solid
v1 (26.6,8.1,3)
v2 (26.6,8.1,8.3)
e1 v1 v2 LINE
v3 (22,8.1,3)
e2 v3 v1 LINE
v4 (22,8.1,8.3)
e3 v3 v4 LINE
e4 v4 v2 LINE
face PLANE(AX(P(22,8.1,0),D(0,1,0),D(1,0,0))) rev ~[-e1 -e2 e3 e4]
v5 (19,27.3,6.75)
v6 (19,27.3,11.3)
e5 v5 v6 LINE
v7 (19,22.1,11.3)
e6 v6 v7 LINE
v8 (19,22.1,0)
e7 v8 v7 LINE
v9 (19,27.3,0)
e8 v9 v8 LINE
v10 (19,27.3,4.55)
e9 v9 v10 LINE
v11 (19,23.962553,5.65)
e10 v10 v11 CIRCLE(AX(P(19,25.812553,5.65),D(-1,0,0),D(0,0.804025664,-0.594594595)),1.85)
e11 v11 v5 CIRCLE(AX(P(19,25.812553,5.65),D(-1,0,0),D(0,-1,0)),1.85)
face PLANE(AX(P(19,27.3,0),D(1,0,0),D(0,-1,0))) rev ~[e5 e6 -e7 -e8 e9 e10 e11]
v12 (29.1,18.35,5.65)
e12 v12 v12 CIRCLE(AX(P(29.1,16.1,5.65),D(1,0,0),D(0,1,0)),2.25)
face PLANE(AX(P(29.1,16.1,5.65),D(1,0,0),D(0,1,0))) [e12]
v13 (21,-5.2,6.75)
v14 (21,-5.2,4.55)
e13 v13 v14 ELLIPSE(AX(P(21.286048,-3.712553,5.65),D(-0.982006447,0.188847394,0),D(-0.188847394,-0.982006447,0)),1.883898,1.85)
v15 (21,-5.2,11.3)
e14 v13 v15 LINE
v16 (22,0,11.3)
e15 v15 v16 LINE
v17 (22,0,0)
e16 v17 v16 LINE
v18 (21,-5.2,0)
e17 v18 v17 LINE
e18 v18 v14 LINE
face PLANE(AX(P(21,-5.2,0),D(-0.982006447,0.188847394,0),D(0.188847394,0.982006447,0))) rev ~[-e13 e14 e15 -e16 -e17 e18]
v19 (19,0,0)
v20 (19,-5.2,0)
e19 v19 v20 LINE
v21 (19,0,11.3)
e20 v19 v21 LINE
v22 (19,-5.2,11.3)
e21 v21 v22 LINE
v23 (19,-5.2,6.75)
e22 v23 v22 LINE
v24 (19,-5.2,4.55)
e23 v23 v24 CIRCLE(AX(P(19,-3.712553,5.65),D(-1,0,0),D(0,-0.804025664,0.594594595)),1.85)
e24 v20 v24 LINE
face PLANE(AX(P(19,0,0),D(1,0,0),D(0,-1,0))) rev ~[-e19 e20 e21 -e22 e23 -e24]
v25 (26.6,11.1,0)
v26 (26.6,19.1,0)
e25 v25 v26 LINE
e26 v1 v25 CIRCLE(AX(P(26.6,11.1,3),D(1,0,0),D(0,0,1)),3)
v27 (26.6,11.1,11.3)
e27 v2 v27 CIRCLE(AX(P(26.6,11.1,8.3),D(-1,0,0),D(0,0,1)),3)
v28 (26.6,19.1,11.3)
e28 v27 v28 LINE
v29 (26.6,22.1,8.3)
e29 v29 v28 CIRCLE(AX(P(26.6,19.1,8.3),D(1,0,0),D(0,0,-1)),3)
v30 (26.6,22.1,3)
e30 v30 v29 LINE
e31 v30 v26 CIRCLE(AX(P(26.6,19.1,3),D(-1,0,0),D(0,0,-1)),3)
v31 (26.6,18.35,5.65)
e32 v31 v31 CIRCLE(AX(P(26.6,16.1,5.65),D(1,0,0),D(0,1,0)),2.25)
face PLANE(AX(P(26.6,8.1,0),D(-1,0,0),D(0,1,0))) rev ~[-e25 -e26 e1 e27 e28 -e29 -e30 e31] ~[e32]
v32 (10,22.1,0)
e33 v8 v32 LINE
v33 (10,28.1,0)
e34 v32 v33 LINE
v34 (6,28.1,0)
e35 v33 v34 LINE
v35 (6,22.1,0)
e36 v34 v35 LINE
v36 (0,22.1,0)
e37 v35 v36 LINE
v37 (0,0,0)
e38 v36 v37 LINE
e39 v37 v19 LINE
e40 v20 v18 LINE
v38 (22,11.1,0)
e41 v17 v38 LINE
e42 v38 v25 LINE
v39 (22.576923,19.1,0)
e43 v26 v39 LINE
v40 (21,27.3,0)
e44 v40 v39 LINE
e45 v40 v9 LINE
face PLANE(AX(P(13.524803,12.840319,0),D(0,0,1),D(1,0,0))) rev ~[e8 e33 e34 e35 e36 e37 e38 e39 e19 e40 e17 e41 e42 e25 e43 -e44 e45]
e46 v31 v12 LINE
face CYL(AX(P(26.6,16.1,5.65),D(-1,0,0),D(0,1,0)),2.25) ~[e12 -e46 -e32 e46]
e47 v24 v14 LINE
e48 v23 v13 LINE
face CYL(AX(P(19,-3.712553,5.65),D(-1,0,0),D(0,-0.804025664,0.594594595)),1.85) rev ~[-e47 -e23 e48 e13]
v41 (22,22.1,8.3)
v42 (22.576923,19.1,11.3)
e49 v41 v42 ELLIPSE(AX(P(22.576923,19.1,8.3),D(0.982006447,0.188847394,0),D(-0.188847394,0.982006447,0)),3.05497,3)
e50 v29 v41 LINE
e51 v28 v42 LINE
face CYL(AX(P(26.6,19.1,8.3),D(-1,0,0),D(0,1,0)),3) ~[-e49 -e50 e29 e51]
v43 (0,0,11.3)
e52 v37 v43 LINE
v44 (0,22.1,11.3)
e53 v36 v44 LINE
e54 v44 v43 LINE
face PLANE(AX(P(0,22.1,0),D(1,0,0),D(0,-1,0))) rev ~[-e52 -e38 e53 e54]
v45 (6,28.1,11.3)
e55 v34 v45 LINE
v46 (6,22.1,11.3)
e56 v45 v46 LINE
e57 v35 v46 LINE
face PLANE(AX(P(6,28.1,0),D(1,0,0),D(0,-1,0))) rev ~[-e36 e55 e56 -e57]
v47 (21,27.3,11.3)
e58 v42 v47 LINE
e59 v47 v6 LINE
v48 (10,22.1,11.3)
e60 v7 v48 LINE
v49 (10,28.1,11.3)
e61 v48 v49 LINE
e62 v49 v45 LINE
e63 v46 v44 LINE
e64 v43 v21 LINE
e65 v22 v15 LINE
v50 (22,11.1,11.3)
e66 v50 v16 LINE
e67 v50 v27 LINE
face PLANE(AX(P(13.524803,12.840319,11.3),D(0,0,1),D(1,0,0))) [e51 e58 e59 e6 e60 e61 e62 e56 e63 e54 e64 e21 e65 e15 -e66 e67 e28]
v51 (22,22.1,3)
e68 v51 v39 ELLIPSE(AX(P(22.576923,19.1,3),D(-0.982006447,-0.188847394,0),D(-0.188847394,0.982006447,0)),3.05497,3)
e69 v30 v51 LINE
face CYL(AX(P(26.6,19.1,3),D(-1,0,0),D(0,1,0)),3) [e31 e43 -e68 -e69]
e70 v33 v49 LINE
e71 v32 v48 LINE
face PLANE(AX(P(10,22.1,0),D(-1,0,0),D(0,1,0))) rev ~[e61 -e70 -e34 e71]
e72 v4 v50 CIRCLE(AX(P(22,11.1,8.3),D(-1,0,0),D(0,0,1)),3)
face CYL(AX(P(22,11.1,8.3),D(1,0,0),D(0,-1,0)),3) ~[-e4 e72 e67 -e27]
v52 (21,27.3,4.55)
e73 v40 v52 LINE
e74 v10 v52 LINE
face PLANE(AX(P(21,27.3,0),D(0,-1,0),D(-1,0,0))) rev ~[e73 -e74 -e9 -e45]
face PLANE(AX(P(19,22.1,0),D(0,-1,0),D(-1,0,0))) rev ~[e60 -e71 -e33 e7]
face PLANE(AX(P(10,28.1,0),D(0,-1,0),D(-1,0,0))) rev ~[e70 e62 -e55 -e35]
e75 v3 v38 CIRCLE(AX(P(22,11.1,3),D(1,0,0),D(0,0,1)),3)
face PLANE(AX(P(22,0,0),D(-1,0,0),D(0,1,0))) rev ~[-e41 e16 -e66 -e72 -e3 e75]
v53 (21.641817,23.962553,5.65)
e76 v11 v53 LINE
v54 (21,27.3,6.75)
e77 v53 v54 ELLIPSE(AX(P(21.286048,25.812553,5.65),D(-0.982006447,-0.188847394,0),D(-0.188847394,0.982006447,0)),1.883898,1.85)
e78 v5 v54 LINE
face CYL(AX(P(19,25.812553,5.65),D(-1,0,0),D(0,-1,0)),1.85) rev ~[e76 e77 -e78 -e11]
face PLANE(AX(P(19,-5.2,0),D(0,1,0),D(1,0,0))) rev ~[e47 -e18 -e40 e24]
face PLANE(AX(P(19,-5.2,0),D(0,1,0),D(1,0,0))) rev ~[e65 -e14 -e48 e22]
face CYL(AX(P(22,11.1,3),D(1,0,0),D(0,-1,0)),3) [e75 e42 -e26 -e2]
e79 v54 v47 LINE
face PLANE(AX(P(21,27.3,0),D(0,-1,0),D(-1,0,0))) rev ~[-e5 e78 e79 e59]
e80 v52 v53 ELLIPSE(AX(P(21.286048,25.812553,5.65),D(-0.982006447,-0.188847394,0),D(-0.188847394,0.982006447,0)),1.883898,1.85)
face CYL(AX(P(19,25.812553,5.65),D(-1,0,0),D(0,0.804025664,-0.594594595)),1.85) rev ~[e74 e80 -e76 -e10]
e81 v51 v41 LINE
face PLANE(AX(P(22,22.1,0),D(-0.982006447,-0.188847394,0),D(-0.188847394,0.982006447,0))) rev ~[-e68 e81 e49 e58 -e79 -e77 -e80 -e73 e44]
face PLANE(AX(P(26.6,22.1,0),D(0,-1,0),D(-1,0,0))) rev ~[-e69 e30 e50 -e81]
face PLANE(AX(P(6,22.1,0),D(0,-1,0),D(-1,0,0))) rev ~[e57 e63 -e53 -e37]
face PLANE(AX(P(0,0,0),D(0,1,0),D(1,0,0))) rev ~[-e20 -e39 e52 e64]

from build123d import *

# Parameters (mm, degrees)
F1_DEPTH = 11.3
F2_R     = 3
F3_R     = 2.25
F4_DEPTH = 2.5
F6_DEPTH = 25


# Not quite as in the source:
# - a feature names something its author has since deleted; it is built from what else it names


with BuildPart() as f1:
    # F0 (on Top) → F1 (new body)
    with BuildSketch(Plane.XY):
        Polygon((0, 22.1), (0, 0), (19, 0), (19, -5.2), (21, -5.2), (22, 0), (22, 8.1), (26.6, 8.1), (26.6, 22.1), (22, 22.1), (21, 27.3), (19, 27.3), (19, 22.1), (10, 22.1), (10, 28.1), (6, 28.1), (6, 22.1), align=None)
    extrude(amount=F1_DEPTH)

    # F2
    f2_edges = [f1.edges().sort_by_distance(p)[0] for p in [
        (24.3, 8.1, 0),
        (24.3, 8.1, 11.3),
        (24.3, 22.1, 11.3),
        (24.3, 22.1, 0),
    ]]
    fillet(f2_edges, radius=F2_R)

    # F3 (on face) → F4 (join)
    with BuildSketch(Plane.YZ.offset(26.6)):
        with Locations((16.1, 5.65)):
            Circle(F3_R)
    extrude(amount=F4_DEPTH)

    # F5 (on face) → F6 (cut)
    with BuildSketch(Plane(origin=(19, 0, 0), x_dir=(0, -1, 0), z_dir=(-1, 0, 0))):
        with BuildLine():
            Line((5.2, 4.55), (5.2, 6.75))
            ThreePointArc((5.2, 6.75), (1.8625525219, 5.65), (5.2, 4.55))
        make_face()
        with BuildLine():
            ThreePointArc((-27.3, 4.55), (-25.2334488328, 3.8929744119), (-23.9625525219, 5.65))
            ThreePointArc((-23.9625525219, 5.65), (-25.2334488328, 7.4070255881), (-27.3, 6.75))
            Line((-27.3, 6.75), (-27.3, 4.55))
        make_face()
    extrude(amount=-F6_DEPTH, mode=Mode.SUBTRACT)


solid = f1.part
